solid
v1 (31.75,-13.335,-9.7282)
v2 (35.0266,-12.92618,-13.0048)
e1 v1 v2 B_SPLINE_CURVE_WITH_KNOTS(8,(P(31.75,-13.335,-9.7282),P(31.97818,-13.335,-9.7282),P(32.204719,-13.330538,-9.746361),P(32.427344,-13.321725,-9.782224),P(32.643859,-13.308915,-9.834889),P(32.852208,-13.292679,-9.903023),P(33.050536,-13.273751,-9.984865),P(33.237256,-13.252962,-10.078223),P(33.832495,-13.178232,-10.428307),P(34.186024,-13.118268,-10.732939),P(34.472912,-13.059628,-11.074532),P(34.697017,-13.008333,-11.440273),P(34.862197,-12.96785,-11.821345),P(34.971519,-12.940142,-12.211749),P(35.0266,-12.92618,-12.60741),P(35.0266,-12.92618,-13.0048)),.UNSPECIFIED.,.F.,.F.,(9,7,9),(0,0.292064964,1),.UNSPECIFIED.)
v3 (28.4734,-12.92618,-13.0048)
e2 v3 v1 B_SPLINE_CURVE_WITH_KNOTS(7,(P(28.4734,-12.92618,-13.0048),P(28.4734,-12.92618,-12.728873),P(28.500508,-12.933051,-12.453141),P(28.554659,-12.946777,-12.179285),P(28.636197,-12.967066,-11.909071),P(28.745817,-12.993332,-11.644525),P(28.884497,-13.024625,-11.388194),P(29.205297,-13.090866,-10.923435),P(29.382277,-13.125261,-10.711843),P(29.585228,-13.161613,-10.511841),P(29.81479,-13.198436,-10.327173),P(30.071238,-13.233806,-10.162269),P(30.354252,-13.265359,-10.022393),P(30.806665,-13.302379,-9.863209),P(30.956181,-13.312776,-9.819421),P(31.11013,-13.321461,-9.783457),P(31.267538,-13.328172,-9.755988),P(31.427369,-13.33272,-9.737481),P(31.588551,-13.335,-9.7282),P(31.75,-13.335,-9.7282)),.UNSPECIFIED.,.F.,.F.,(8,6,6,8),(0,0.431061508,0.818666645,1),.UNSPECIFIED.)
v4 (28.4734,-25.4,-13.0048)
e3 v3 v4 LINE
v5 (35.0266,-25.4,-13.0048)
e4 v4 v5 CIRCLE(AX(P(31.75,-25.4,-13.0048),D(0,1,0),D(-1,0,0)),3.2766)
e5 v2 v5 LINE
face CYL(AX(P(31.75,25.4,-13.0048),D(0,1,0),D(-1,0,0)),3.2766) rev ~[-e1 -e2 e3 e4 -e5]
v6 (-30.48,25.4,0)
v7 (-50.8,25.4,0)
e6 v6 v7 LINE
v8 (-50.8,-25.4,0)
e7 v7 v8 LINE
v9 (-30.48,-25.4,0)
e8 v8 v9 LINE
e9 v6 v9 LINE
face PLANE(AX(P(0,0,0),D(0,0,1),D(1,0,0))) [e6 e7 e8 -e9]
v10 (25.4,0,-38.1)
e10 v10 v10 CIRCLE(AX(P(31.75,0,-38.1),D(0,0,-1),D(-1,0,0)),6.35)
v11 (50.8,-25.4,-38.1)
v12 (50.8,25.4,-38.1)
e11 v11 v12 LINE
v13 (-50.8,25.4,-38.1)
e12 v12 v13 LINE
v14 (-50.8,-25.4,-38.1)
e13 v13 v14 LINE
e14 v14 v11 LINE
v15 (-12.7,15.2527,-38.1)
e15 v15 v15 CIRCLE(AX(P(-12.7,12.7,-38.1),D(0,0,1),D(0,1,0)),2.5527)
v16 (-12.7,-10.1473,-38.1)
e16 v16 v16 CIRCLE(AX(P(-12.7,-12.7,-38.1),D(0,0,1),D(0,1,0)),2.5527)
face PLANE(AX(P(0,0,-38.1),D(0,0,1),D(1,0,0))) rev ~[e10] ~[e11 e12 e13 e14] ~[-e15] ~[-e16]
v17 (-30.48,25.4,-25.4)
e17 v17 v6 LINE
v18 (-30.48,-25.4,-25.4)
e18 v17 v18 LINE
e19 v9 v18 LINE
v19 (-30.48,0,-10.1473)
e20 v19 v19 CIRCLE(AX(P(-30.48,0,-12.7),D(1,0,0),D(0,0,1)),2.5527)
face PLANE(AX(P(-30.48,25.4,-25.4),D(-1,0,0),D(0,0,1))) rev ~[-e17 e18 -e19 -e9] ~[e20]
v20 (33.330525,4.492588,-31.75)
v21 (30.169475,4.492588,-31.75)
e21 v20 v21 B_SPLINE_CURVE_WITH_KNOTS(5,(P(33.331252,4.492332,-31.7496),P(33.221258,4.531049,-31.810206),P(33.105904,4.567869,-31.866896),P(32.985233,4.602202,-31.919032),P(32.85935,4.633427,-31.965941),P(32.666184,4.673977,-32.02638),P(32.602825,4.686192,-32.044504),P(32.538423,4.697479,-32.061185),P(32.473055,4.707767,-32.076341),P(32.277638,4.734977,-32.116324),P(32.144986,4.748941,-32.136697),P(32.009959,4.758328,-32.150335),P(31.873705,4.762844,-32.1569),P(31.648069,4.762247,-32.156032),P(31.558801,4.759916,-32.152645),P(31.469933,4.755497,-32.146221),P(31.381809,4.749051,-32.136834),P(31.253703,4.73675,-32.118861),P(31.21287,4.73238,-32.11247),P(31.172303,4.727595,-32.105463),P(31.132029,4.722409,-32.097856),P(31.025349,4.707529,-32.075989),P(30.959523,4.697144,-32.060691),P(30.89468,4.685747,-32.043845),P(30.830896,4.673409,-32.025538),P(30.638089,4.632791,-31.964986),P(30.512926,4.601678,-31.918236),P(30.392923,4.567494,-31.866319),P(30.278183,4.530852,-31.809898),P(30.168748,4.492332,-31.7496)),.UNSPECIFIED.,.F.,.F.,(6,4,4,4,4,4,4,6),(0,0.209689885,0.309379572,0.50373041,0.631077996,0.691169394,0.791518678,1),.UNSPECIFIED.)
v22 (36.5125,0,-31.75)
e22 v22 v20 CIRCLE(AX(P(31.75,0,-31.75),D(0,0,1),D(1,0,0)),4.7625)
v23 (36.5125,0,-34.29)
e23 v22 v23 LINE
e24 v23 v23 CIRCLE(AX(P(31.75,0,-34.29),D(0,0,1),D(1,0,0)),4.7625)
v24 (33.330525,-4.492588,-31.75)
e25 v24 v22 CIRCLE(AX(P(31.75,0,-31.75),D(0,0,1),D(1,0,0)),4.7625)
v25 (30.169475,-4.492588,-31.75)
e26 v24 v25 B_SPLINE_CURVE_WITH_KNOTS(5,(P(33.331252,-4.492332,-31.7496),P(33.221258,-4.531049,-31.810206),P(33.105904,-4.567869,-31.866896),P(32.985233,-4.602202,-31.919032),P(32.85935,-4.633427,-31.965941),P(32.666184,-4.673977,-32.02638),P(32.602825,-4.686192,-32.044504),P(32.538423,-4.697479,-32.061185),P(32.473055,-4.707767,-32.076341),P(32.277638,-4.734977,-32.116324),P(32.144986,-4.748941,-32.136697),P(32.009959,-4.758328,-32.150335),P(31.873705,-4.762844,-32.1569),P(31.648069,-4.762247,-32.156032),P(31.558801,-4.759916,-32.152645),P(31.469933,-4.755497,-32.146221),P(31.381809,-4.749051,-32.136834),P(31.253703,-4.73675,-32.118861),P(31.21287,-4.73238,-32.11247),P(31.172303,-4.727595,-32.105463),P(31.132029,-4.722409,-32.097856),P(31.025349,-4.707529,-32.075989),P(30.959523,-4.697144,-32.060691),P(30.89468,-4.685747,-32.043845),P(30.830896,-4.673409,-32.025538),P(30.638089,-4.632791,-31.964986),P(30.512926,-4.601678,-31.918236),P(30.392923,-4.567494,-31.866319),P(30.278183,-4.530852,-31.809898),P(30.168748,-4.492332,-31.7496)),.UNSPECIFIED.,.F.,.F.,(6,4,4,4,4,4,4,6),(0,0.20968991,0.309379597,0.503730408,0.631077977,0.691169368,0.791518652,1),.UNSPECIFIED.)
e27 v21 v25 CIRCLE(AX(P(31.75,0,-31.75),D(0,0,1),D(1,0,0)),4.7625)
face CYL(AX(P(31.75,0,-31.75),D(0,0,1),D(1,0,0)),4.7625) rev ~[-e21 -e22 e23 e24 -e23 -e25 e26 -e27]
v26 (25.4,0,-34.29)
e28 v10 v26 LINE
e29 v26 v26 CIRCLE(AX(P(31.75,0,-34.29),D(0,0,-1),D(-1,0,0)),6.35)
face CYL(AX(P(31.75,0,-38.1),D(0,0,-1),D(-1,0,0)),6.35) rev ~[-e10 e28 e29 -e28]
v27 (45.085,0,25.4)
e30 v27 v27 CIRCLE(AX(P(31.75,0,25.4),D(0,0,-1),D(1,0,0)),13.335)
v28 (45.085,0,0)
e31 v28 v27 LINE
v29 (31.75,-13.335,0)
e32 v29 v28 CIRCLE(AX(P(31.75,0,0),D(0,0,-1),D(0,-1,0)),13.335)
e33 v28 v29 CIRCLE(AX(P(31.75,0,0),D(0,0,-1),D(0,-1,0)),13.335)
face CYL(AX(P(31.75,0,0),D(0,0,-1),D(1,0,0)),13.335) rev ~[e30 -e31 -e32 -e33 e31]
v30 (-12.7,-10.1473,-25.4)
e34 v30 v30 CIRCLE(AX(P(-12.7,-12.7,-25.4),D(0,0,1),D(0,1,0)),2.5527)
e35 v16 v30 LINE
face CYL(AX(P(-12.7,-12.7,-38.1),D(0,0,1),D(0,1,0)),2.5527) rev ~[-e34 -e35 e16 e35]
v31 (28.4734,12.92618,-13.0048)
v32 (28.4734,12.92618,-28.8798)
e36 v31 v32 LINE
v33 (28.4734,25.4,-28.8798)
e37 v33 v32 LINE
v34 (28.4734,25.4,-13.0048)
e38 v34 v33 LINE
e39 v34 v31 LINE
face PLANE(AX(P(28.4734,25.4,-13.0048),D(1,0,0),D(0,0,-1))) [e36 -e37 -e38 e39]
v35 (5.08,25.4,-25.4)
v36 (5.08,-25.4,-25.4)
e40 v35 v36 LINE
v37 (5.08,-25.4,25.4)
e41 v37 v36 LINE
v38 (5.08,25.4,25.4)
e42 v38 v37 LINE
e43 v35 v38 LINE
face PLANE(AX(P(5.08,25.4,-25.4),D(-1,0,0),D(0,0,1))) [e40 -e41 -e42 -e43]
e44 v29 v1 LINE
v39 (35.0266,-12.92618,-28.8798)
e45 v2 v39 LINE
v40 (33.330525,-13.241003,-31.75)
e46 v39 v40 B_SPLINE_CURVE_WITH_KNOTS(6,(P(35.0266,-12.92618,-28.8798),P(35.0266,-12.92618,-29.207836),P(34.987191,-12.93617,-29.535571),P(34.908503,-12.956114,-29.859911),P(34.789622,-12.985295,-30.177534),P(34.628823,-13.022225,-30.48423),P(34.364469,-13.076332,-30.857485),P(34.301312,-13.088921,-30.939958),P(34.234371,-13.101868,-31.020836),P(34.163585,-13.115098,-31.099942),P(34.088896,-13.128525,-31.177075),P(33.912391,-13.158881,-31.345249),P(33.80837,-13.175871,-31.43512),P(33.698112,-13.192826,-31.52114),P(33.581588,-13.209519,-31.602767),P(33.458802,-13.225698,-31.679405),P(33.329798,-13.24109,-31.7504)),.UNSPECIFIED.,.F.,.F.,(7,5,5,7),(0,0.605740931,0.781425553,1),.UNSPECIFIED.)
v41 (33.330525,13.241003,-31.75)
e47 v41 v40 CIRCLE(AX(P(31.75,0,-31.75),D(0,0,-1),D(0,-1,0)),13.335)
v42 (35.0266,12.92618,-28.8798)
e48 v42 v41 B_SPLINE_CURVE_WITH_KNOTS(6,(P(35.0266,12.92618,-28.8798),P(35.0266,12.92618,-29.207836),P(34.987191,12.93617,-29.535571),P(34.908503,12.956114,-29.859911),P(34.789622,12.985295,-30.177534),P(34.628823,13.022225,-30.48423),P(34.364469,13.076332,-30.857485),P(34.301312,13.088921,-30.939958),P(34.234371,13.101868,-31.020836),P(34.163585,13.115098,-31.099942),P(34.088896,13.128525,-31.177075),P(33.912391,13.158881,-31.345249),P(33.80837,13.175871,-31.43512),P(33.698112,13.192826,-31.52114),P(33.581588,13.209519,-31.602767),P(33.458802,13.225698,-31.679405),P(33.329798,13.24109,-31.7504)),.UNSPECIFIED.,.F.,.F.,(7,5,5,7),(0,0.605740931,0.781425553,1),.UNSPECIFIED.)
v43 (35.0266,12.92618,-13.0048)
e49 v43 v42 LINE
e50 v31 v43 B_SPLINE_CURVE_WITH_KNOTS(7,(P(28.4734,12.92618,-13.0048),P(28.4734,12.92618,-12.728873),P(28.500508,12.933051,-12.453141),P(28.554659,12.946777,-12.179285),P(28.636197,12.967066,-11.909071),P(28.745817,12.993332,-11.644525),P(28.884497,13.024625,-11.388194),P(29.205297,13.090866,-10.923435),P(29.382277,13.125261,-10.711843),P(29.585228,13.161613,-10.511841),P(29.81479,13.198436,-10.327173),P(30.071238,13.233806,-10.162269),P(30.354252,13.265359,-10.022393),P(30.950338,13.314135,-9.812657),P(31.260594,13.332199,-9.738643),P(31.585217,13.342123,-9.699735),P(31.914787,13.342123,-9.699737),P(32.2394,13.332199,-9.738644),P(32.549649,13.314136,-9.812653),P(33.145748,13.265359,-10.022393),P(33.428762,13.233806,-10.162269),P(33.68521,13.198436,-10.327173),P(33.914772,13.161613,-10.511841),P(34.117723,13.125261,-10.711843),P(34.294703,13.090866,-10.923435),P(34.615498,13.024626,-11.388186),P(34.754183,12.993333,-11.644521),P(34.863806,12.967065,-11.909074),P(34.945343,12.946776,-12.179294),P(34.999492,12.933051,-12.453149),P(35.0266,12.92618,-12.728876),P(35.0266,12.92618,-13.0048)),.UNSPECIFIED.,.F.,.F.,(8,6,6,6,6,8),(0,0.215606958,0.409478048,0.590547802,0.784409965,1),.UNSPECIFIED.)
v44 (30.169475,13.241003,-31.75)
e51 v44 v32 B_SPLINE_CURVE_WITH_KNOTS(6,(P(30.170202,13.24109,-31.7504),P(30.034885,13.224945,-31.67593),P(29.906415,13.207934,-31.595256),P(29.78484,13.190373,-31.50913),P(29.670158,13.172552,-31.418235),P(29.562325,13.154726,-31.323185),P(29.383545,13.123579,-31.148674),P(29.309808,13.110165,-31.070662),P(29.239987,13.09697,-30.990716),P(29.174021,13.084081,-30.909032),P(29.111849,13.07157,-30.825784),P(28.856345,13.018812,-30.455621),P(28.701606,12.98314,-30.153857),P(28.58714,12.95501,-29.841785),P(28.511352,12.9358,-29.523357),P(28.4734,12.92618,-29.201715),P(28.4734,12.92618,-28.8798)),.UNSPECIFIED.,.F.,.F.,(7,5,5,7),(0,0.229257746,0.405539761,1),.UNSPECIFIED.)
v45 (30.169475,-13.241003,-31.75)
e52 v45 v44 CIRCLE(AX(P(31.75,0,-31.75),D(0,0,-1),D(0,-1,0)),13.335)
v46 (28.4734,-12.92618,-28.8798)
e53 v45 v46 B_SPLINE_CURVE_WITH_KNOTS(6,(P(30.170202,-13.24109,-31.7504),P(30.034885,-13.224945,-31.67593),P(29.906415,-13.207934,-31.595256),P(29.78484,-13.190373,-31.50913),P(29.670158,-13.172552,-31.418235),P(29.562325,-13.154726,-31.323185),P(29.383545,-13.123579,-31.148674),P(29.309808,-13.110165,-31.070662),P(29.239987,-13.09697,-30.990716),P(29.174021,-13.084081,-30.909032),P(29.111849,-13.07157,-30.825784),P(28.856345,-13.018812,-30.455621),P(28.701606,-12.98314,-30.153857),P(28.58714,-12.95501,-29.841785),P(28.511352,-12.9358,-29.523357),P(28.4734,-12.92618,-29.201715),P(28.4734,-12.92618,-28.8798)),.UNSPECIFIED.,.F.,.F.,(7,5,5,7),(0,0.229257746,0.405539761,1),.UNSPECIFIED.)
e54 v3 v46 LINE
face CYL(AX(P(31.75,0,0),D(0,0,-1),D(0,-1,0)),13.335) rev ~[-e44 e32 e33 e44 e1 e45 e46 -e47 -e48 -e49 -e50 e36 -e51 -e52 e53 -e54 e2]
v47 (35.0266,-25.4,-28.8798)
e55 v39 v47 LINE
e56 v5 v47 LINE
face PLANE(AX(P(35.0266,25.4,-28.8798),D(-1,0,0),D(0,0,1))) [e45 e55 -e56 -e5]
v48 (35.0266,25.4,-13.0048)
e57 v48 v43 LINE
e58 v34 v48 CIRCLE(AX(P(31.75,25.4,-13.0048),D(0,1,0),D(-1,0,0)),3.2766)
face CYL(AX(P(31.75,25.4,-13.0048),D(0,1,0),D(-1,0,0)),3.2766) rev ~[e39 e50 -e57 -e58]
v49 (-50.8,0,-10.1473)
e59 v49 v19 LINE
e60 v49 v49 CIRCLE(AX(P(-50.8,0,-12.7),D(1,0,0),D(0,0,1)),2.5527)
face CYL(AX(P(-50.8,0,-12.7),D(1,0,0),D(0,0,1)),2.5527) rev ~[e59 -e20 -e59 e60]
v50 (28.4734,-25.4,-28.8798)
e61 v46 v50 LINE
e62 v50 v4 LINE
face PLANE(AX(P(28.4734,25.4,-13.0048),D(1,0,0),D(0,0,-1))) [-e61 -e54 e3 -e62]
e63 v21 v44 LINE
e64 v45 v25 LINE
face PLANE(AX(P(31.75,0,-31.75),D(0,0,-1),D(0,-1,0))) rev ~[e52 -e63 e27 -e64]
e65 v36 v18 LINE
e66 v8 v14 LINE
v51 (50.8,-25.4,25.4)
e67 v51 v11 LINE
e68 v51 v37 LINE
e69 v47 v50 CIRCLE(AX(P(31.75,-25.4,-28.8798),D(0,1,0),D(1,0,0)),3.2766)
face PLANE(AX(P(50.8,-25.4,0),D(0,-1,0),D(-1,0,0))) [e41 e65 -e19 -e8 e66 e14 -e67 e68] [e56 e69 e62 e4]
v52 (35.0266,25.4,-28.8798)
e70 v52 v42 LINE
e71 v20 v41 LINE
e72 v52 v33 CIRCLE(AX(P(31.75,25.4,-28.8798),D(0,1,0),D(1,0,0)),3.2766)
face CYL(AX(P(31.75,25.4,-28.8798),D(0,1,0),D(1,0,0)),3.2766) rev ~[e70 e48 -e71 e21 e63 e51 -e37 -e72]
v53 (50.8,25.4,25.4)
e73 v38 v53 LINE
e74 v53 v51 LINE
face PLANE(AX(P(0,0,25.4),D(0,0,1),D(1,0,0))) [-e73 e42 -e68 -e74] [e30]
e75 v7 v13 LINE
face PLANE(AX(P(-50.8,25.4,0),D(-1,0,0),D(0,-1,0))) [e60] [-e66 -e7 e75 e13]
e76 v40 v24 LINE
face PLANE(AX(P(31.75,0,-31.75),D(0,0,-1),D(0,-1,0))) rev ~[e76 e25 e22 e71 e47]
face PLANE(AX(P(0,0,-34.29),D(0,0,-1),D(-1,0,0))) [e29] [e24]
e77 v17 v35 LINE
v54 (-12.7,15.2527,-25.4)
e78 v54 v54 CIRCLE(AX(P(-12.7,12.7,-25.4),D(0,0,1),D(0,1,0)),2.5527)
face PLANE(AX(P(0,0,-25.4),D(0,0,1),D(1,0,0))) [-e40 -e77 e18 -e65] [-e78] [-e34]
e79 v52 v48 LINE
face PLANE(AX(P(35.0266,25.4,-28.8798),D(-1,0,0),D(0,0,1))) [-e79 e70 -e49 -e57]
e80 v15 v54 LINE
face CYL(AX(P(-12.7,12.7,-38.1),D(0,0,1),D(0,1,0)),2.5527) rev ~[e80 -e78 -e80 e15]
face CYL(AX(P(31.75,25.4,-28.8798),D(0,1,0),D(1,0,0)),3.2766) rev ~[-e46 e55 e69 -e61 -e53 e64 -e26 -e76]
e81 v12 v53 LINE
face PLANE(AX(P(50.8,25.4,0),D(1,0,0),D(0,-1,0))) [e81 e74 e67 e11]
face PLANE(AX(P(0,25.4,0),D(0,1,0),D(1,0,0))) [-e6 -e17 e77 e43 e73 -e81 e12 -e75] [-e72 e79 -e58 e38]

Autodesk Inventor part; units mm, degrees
ref_plane "YZ Plane" through (0, 0, 0) normal (1, 0, 0) x (0, 1, 0)
ref_plane "XZ Plane" through (0, 0, 0) normal (0, 1, 0) x (-1, 0, 0)
ref_plane "XY Plane" through (0, 0, 0) normal (0, 0, 1) x (1, 0, 0)
sketch "Sketch1" plane through (0, 0, 0) normal (0, 0, 1) x (1, 0, 0)
  line L0 (-50.8, -25.4) -> (50.8, -25.4)
  line L1 (50.8, -25.4) -> (50.8, 25.4)
  line L2 (50.8, 25.4) -> (-50.8, 25.4)
  line L3 (-50.8, 25.4) -> (-50.8, -25.4)
  line L4 (-50.8, -25.4) -> (50.8, 25.4) construction
  line L5 (50.8, -25.4) -> (-50.8, 25.4) construction
  point P0 (0, 0)
  dimension "d0" = 50.8
  dimension "d1" = 101.6
extrude "Extrusion1" add sketch "Sketch1" against normal blind 38.1
sketch "Sketch2" plane through (0, 0, 0) normal (0, 0, 1) x (1, 0, 0)
  line L0 (-50.8, 25.4) -> (50.8, 25.4) projected
  line L1 (50.8, -25.4) -> (-50.8, -25.4) projected
  line L2 (-25.4, 25.4) -> (0, 25.4)
  line L3 (0, 25.4) -> (0, -25.4)
  line L4 (0, -25.4) -> (-25.4, -25.4)
  line L5 (-25.4, -25.4) -> (-25.4, 25.4)
  line L6 (-50.8, 25.4) -> (-50.8, -25.4) projected
  point P0 (0, 0)
  dimension "d4" = 25.4
  dimension "d5" = 25.4
extrude "Extrusion2" cut sketch "Sketch2" against normal blind 25.4 contours L0 L3 L1 L5
sketch "Sketch3" plane through (0, 0, 0) normal (0, 0, 1) x (1, 0, 0)
  line L0 (0, 25.4) -> (0, -25.4) projected
  point P0 (0, 0)
  point P1 (31.75, 0)
  dimension "d8" = 31.75
hole "Hole1" at (31.75, 0, 0) direction (0, 0, -1) diameter 26.67 depth 31.75
sketch "Sketch4" plane through (31.75, 0, -31.75) normal (0, 0, 1) x (1, 0, 0)
  circle A0 centre (0, 0) radius 4.7625
  point P0 (-31.75, 0)
  dimension "d16" = 9.525
extrude "Extrusion3" cut sketch "Sketch4" against normal through all
sketch "Sketch5" plane through (-50.8, 25.4, -38.1) normal (0, 1, 0) x (1, 0, 0)
  line L0 (114.3, -38.1) -> (50.8, -38.1) construction
  line L1 (82.55, -38.1) -> (82.55, 0) construction
  line L2 (0, 0) -> (101.6, 0) construction
  line L3 (50.8, -12.7) -> (50.8, -38.1) projected
  line L4 (82.55, -9.2202) -> (82.55, -25.0952) construction
  line L5 (85.8266, -9.2202) -> (85.8266, -25.0952)
  line L6 (79.2734, -25.0952) -> (79.2734, -9.2202)
  arc A0 (85.8266, -9.2202) -> (79.2734, -9.2202) centre (82.55, -9.2202) ccw
  arc A1 (79.2734, -25.0952) -> (85.8266, -25.0952) centre (82.55, -25.0952) ccw
  point P0 (82.55, -15.5702)
  point P1 (82.55, -17.1577)
  dimension "d19" = 15.5702
  dimension "d44" = 31.75
  dimension "d64" = 6.35
  dimension "d65" = 6.5532
  dimension "d66" = 9.525
sketch "Sketch6" plane through (0, 0, -38.1) normal (0, 0, -1) x (-1, 0, 0)
  line L0 (25.4, 25.4) -> (0, 25.4) construction
  line L1 (12.7, 25.4) -> (12.7, -25.4) construction
  line L2 (-50.8, -25.4) -> (50.8, -25.4) construction
  point P0 (0, 0)
  point P1 (12.7, 12.7)
  point P2 (12.7, -12.7)
  dimension "d27" = 12.7
  dimension "d28" = 12.7
hole "Hole3" at (-12.7, 12.7, -38.1) at (-12.7, -12.7, -38.1) direction (0, 0, 1) diameter 5.1054 end through all
sketch "Sketch7" plane through (-50.8, -25.4, 0) normal (-1, 0, 0) x (0, 0, 1)
  line L0 (0, 50.8) -> (-38.1, 50.8) construction
  line L1 (-12.7, 50.8) -> (-12.7, 0) construction
  line L2 (0, 0) -> (-38.1, 0) construction
  point P0 (0, 25.4)
  point P1 (-25.4, 50.8)
  point P2 (-12.7, 25.4)
  dimension "d36" = 12.7
hole "Hole4" at (-50.8, 0, -12.7) direction (1, 0, 0) diameter 5.1054 end up to surface clearance for "Flat Head Machine Screw (82)" size "#10" standard "Ansi Unified Screw Threads"
sketch "Sketch8" plane through (0, 0, 0) normal (0, 0, 1) x (1, 0, 0)
  point P0 (0, 0)
sketch "Sketch9" plane through (0, 0, 0) normal (0, 0, 1) x (1, 0, 0)
  line L0 (-25.4, 25.4) -> (0, 25.4) projected
  line L1 (50.8, 25.4) -> (50.8, -25.4) projected
  line L2 (0, 25.4) -> (50.8, 25.4)
  line L3 (50.8, 25.4) -> (50.8, -25.4)
  line L4 (50.8, -25.4) -> (0, -25.4)
  line L5 (0, -25.4) -> (0, 25.4)
  circle A0 centre (31.75, 0) radius 13.335 projected
  circle A1 centre (31.75, 0) radius 13.335
  point P0 (0, 0)
extrude "Extrusion4" add sketch "Sketch9" along normal blind 41.275
sketch "Sketch10" plane through (-50.8, 25.4, -38.1) normal (0, 1, 0) x (1, 0, 0)
  line L0 (77.7875, 0) -> (87.3125, 0) construction
  line L1 (82.55, 0) -> (82.55, -79.375) construction
  line L2 (50.8, -79.375) -> (101.6, -79.375) construction
  point P0 (50.8, -38.1)
  point P1 (82.55, -69.85)
  dimension "d47" = 9.525
hole "Hole5" at (31.75, 25.4, 31.75) direction (0, -1, 0) diameter 5.7912 end through all clearance for "Flat Head Machine Screw (82)" size "#12" standard "Ansi Unified Screw Threads"
sketch "Sketch11" plane through (0, 0, -38.1) normal (0, 0, -1) x (-1, 0, 0)
  circle A0 centre (-31.75, 0) radius 4.7625 projected
  circle A1 centre (-31.75, 0) radius 6.35
  point P0 (0, 0)
  dimension "d55" = 12.7
extrude "Extrusion5" cut sketch "Sketch11" against normal blind 3.81
sketch "Sketch13" plane through (0, 0, 41.275) normal (0, 0, 1) x (1, 0, 0)
  line L0 (50.8, -25.4) -> (-50.8, -25.4) projected
  line L1 (0, 25.4) -> (0, -25.4) projected
  line L2 (50.8, -25.4) -> (0, -25.4)
  line L3 (0, -25.4) -> (0, 25.4)
  line L4 (0, 25.4) -> (50.8, 25.4)
  line L5 (50.8, 25.4) -> (50.8, -25.4)
  point P0 (0, 0)
extrude "Extrusion6" cut sketch "Sketch13" against normal blind 15.875
sketch "Sketch16" plane through (-50.8, 25.4, -38.1) normal (0, 1, 0) x (1, 0, 0)
  line L0 (25.4, -38.1) -> (0, -38.1) projected
  line L1 (25.4, -12.7) -> (20.32, -12.7)
  line L2 (20.32, -12.7) -> (20.32, -38.1)
  line L3 (20.32, -38.1) -> (25.4, -38.1)
  line L4 (25.4, -38.1) -> (25.4, -12.7)
  line L5 (50.8, -12.7) -> (50.8, -63.5) projected
  line L6 (101.6, -63.5) -> (50.8, -63.5) projected
  line L7 (50.8, -12.7) -> (55.88, -12.7)
  line L8 (55.88, -12.7) -> (55.88, -63.5)
  line L9 (55.88, -63.5) -> (50.8, -63.5)
  line L10 (50.8, -63.5) -> (50.8, -12.7)
  point P0 (50.8, -38.1)
  dimension "d60" = 5.08
  dimension "d61" = 5.08
extrude "Extrusion7" cut sketch "Sketch16" against normal through all
extrude "Extrusion8" cut sketch "Sketch5" against normal through all
equation "\"d0\" = height"
equation "\"d1\" = width"
equation "\"d2\" = depth"
equation "\"d6\" = slotFor1x1"
equation "\"d8\" = centerOfMotorShaft"
equation "\"d9\" = shaftDiameter + clearanceForRotation"
equation "\"d44\" = centerOfMotorShaft"
equation "\"width\" = 101.6"
equation "\"height\" = 50.8"
equation "\"depth\" = 38.1"
equation "\"shaftDiameter\" = 25.4"
equation "\"centerOfMotorShaft\" = 31.75"
equation "\"clearanceForRotation\" = 1.27"
equation "\"widthOfCChannel\" = 31.75"
equation "\"slotFor1x1\" = 25.4"
properties part number "blockToSupportShaftAndPot" material "Aluminum 6061"
